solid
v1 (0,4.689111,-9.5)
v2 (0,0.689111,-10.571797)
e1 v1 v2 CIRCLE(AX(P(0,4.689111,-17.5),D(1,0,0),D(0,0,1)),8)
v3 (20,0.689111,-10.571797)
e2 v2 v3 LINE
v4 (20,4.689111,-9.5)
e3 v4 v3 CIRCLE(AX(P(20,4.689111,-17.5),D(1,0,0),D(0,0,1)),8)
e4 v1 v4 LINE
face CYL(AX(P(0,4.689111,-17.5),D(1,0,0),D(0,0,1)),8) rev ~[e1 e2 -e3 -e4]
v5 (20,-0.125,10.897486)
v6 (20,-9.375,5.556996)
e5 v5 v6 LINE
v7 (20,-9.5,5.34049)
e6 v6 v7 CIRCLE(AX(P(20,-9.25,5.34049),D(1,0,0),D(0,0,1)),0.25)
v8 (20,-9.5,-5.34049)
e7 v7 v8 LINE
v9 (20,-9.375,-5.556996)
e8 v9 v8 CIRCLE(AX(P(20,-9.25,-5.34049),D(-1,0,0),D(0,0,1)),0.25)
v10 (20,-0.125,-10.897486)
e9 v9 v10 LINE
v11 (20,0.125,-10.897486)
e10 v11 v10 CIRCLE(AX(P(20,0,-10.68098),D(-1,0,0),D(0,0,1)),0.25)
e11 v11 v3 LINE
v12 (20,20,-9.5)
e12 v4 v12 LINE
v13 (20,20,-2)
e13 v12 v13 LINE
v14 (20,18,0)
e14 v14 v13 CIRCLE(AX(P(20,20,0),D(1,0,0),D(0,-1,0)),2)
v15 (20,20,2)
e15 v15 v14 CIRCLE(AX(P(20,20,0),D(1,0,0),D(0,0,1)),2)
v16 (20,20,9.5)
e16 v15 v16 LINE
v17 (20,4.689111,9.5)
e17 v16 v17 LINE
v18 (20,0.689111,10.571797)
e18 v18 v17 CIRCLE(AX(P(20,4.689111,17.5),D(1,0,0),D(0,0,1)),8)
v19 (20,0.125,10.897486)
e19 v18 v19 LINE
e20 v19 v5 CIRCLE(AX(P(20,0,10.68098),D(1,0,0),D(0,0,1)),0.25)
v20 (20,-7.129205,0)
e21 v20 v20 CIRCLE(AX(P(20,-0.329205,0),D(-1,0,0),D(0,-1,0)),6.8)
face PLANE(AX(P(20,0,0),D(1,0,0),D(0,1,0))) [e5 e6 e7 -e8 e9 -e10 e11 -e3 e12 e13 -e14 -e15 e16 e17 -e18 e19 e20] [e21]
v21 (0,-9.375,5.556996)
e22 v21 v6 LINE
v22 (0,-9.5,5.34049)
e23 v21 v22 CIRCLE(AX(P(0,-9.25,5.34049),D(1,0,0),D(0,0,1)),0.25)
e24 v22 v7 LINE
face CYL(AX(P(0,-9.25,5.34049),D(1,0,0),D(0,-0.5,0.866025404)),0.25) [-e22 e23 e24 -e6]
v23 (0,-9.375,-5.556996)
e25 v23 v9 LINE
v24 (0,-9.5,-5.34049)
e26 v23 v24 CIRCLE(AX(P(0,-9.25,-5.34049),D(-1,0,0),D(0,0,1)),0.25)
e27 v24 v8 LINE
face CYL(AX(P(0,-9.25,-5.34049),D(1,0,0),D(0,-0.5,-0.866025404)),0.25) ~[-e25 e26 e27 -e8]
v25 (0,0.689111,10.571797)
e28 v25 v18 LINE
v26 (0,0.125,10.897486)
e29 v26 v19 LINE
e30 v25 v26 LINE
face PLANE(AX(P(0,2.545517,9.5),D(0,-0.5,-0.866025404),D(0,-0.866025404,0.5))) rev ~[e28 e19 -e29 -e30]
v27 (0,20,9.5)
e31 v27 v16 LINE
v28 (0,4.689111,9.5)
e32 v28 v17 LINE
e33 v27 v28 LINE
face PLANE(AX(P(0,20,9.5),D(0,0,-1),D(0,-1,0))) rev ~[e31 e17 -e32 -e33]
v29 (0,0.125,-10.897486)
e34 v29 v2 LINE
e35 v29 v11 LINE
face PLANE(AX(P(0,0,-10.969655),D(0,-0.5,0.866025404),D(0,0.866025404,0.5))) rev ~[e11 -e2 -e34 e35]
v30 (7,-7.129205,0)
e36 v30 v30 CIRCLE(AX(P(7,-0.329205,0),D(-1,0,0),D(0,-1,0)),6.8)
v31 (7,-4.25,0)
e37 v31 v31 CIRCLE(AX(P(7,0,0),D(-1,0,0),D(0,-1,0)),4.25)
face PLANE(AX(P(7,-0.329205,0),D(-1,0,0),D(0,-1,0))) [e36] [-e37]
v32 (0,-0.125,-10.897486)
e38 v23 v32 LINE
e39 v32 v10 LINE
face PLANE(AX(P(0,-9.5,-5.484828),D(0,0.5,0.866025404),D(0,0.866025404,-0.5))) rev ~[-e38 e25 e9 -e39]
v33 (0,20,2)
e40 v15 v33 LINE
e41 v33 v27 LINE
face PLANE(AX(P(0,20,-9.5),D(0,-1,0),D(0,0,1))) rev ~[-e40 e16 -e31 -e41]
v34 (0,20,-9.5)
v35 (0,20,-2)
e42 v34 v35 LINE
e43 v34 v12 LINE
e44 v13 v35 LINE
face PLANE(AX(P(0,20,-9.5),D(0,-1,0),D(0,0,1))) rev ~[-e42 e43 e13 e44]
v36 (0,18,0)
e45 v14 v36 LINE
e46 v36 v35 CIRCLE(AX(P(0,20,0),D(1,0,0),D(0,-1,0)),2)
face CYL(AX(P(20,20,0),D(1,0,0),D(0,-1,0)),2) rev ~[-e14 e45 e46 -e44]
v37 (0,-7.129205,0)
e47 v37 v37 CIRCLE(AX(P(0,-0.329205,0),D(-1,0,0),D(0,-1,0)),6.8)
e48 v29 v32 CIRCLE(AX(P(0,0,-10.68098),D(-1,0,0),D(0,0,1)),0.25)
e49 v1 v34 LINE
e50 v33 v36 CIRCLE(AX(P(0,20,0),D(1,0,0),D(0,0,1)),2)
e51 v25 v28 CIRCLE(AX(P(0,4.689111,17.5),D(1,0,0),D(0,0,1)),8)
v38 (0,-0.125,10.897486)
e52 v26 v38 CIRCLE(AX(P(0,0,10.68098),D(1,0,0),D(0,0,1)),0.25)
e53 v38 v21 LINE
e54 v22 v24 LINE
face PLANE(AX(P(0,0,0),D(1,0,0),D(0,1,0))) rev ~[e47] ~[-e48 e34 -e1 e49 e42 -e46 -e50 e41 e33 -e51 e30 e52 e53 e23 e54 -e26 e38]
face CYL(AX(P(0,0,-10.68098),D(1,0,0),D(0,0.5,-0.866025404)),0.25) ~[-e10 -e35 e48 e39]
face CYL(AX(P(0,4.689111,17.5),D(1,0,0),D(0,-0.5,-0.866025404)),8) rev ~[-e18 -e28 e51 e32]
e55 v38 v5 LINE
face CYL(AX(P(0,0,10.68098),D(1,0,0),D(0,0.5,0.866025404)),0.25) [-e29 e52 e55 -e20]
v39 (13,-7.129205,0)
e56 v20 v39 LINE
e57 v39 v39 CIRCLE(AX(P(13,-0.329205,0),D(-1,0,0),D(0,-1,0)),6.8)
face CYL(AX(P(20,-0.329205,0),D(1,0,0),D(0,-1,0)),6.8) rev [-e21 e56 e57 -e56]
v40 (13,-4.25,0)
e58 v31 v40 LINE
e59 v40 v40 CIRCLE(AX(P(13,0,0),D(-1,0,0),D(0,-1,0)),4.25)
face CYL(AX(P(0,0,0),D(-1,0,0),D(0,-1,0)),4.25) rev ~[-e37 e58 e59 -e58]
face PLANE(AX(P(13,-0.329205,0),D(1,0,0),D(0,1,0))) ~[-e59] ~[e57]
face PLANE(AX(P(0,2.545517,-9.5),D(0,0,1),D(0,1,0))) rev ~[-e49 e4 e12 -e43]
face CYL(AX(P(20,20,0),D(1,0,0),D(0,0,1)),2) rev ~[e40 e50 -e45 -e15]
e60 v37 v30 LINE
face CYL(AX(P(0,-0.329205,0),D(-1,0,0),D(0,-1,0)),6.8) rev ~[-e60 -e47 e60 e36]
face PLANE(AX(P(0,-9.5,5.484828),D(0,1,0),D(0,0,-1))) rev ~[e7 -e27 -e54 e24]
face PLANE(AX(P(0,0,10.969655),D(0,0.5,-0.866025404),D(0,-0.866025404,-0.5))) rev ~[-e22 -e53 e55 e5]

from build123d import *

# Parameters (mm, degrees)
F1_DEPTH  = 20
F4_R      = 4.25
F5_DEPTH  = 20.001
F6_R      = 6.8
F6_R_2    = 4.25
F7_DEPTH  = 7
F10_R     = 8
F12_DEPTH = 20.001
F13_R     = 0.25


# Not quite as in the source:
# - a feature names something its author has since deleted; it is built from what else it names


with BuildPart() as f1:
    # F0 (on Right) → F1 (new body)
    with BuildSketch(Plane.YZ):
        Polygon((2.5455173281, 9.5), (0, 10.9696551146), (-9.5, 5.4848275573), (-9.5, -5.4848275573), (0, -10.9696551146), (2.5455173281, -9.5), (9.5, -5.4848275573), (9.5, 0), (9.5, 5.4848275573), align=None)
        Polygon((20, 9.5), (2.5455173281, 9.5), (9.5, 5.4848275573), (9.5, 0), (20, 0), align=None)
        Polygon((20, 0), (9.5, 0), (9.5, -5.4848275573), (2.5455173281, -9.5), (20, -9.5), align=None)
    extrude(amount=F1_DEPTH)

    # F4 (on face) → F5 (cut, through all)
    with BuildSketch(Plane(origin=(0, 0, 0), x_dir=(0, -1, 0), z_dir=(-1, 0, 0))):
        Circle(F4_R)
    extrude(amount=-F5_DEPTH, mode=Mode.SUBTRACT)


with BuildPart() as f7:
    # F6 (on face) → F7 (new body)
    with BuildSketch(Plane(origin=(0, 0, 0), x_dir=(0, -1, 0), z_dir=(-1, 0, 0))):
        with Locations((0.3292050309, 0)):
            Circle(F6_R)
        Circle(F6_R_2, mode=Mode.SUBTRACT)
        Circle(F6_R_2)
    extrude(amount=-F7_DEPTH)


with BuildPart() as f8_1:
    # F8: instance of F7
    add(f7.part.mirror(Plane(origin=(10, 5.820047307, 0), x_dir=(0, 1, 0), z_dir=(1, 0, 0))))


with BuildPart() as f1_1:
    add(f1.part)

    # F9: cut F7, F8_1
    add(f7.part, mode=Mode.SUBTRACT)
    add(f8_1.part, mode=Mode.SUBTRACT)

    # F10
    f10_edges = [f1_1.edges().sort_by_distance(p)[0] for p in [
        (10, 2.545517, -9.5),
        (10, 2.545517, 9.5),
    ]]
    fillet(f10_edges, radius=F10_R)

    # F11 (on face) → F12 (cut, through all)
    with BuildSketch(Plane.YZ.offset(20)):
        with BuildLine():
            Line((20, 0), (20, 2))
            ThreePointArc((20, 2), (18.5857864376, 1.4142135624), (18, 0))
            Line((18, 0), (20, 0))
        make_face()
        with BuildLine():
            ThreePointArc((18, 0), (18.5857864376, -1.4142135624), (20, -2))
            Line((20, -2), (20, 0))
            Line((20, 0), (18, 0))
        make_face()
        with BuildLine():
            ThreePointArc((20, -2), (21.4142135624, -1.4142135624), (22, 0))
            ThreePointArc((22, 0), (21.4142135624, 1.4142135624), (20, 2))
            Line((20, 2), (20, 0))
            Line((20, 0), (20, -2))
        make_face()
    extrude(amount=-F12_DEPTH, mode=Mode.SUBTRACT)

    # F13
    f13_edges = [f1_1.edges().sort_by_distance(p)[0] for p in [
        (10, -9.5, -5.484828),
        (10, -9.5, 5.484828),
        (10, 0, 10.969655),
        (10, 0, -10.969655),
    ]]
    fillet(f13_edges, radius=F13_R)


solid = f1_1.part
